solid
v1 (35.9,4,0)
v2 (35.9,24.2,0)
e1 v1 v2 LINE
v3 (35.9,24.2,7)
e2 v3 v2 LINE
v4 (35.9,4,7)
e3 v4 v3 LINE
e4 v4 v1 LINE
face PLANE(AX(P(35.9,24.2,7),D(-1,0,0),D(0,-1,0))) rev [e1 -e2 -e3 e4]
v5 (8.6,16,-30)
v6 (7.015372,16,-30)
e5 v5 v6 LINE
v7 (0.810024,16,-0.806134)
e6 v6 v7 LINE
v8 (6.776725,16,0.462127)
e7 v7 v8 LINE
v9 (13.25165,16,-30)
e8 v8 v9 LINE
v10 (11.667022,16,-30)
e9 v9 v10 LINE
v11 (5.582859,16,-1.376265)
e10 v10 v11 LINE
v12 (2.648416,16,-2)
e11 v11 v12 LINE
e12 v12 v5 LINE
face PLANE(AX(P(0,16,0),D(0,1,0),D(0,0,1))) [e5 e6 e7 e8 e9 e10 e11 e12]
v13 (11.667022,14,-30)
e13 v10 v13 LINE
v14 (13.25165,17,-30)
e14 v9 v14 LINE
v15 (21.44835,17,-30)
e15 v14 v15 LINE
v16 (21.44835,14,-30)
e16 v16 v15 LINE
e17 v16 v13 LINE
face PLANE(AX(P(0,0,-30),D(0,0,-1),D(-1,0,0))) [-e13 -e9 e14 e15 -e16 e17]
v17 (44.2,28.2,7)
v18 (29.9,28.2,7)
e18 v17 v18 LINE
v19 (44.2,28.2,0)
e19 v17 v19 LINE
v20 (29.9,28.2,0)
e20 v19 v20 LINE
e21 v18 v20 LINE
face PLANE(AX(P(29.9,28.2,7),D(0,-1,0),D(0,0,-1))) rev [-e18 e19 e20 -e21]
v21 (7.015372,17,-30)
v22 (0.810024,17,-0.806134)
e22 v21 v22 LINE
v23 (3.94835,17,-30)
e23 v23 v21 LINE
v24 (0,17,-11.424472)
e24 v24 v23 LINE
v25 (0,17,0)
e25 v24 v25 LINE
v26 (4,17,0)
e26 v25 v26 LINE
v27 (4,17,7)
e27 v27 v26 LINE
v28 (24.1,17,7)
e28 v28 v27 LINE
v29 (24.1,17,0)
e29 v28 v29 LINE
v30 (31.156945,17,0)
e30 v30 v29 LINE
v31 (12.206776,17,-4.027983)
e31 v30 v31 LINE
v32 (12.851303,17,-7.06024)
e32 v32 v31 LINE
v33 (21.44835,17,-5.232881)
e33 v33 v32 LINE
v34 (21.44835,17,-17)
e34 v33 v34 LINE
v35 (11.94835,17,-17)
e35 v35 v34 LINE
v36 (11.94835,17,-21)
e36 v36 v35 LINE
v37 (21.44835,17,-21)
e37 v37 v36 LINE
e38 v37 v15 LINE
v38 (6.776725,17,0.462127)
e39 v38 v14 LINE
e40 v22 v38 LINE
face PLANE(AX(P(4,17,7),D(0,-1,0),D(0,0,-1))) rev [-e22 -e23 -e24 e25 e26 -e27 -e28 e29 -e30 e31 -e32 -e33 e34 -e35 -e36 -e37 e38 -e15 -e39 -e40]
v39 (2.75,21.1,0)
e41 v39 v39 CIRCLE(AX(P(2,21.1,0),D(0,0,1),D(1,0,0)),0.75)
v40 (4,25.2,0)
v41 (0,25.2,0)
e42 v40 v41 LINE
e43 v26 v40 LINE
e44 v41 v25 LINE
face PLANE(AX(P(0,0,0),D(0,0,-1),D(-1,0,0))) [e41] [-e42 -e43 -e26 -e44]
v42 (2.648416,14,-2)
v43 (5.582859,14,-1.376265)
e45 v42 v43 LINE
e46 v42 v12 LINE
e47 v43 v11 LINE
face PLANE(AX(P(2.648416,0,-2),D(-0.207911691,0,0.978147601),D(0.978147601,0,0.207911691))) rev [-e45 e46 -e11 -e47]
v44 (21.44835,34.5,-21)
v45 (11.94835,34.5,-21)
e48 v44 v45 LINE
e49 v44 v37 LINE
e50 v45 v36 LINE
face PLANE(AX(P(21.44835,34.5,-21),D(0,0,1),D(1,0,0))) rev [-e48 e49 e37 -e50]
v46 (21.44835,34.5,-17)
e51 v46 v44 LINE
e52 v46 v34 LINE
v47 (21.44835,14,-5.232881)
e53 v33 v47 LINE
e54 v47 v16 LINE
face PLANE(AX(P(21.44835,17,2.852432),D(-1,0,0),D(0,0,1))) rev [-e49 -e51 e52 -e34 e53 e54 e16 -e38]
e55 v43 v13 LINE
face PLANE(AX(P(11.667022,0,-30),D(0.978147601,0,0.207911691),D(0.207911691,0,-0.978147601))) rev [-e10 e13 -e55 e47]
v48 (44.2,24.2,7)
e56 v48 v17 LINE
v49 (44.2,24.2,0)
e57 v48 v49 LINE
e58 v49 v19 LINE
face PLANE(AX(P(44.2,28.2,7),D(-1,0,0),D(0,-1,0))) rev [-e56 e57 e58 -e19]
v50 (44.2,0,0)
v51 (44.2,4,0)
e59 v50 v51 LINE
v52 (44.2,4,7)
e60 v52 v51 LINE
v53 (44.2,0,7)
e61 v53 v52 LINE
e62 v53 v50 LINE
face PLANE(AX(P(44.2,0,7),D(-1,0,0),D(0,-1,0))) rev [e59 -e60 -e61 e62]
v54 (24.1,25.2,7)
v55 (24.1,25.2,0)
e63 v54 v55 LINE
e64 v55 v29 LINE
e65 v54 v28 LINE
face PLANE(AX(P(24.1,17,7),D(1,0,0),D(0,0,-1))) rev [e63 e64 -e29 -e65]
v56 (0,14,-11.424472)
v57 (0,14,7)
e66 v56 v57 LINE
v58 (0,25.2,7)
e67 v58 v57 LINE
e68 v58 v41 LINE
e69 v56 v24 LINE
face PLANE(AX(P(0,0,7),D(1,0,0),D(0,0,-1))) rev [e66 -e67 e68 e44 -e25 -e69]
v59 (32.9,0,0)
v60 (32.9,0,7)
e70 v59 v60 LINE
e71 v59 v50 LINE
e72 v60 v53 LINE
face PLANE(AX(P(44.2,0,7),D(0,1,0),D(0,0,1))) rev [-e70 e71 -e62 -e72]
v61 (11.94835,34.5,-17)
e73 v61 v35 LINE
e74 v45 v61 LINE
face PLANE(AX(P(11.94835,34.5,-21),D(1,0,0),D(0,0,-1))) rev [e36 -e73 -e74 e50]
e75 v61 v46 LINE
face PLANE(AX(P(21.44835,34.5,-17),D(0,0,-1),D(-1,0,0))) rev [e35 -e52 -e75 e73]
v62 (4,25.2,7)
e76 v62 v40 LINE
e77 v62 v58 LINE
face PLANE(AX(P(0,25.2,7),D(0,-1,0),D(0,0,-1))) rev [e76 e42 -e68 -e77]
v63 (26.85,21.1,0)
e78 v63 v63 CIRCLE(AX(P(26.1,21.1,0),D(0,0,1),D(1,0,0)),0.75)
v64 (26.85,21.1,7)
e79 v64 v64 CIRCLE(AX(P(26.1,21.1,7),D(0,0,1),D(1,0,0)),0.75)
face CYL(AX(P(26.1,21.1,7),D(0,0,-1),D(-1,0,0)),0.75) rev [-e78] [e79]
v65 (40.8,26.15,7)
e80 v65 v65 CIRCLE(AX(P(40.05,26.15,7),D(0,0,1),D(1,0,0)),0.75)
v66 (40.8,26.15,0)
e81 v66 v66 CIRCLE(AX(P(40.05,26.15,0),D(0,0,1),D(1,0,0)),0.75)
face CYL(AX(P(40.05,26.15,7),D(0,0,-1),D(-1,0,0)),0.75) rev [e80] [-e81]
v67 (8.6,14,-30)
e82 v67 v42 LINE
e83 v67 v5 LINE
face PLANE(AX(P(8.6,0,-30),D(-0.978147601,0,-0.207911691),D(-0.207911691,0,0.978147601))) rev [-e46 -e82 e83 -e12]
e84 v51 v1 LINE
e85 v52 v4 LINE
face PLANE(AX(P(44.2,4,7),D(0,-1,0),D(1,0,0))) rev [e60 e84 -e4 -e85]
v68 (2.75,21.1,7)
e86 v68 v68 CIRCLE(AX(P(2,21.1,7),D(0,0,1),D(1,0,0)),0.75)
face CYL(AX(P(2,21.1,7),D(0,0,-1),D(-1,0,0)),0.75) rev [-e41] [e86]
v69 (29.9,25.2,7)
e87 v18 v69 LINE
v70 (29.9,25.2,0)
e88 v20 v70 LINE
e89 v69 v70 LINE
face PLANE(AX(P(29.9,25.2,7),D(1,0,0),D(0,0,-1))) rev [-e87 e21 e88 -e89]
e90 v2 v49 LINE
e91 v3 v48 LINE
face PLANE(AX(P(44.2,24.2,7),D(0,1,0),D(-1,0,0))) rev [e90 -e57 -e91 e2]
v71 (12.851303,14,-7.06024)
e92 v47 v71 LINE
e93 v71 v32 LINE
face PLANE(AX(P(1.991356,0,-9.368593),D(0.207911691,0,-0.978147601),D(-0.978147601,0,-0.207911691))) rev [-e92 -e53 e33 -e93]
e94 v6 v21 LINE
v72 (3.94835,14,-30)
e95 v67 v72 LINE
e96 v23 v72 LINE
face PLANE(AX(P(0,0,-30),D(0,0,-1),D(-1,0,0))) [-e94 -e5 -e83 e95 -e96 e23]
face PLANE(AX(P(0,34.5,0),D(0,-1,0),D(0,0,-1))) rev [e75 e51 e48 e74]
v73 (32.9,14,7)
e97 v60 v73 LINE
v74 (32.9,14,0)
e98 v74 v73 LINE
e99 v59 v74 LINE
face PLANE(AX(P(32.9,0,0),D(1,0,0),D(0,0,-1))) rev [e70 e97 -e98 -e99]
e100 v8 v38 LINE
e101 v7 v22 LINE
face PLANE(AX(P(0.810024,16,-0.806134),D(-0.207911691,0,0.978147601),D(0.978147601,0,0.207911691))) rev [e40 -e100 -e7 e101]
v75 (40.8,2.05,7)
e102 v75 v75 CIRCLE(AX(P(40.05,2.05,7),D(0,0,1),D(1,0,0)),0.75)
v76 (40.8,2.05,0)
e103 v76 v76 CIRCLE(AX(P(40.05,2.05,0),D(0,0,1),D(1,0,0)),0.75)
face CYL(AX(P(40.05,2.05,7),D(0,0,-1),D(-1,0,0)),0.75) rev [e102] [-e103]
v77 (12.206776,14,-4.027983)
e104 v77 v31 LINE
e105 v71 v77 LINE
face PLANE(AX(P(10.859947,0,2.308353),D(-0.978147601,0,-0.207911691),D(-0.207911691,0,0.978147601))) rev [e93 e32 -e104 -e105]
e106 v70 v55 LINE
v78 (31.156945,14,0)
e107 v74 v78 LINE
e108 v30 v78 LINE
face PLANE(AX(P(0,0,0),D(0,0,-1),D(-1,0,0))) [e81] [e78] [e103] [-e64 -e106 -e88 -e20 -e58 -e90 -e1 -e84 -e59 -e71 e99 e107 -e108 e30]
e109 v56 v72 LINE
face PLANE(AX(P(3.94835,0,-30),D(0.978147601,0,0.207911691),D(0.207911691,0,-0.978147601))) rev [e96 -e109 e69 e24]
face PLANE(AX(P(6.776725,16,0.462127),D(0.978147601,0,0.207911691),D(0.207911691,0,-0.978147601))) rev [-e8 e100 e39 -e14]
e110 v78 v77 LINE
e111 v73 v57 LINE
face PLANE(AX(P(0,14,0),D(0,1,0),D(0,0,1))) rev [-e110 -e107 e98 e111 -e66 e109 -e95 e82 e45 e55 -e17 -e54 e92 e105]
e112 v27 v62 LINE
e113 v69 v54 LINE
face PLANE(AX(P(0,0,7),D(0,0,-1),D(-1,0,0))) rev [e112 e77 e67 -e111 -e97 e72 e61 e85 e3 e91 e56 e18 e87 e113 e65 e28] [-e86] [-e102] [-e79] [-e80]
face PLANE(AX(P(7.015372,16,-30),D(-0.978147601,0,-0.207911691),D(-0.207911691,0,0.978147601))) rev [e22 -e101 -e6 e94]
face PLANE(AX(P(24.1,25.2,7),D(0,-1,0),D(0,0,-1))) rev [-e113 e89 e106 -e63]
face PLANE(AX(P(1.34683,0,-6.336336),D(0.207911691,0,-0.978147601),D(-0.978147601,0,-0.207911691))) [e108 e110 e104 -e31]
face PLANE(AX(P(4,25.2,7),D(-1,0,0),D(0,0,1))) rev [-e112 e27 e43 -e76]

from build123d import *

# Parameters (mm, degrees)
SKETCH1_R               = 0.75
BOSS_EXTRUDE1_DEPTH     = 7
SKETCH9_W               = 32.9
SKETCH9_H               = 14
CUT_EXTRUDE1_DEPTH      = 53.894990311
SKETCH10_W              = 24.1
SKETCH10_H              = 3
BOSS_EXTRUDE2_DEPTH     = 30
CUT_EXTRUDE2_DEPTH      = 57.059254365
CUT_EXTRUDE3_DEPTH      = 57.059254365
CUT_EXTRUDE4_DEPTH      = 1
CUT_EXTRUDE5_DEPTH      = 57.059254365
BOSS_EXTRUDE4_START     = 4
BOSS_EXTRUDE4_OUTLINE_W = 19.373526859
BOSS_EXTRUDE4_OUTLINE_H = 3
BOSS_EXTRUDE4_DEPTH     = 2.47789315
SKETCH21_W              = 25.330744156
SKETCH21_H              = 3
BOSS_EXTRUDE7_DEPTH     = 4
BOSS_EXTRUDE8_START     = 14
BOSS_EXTRUDE8_DEPTH     = 3
CUT_EXTRUDE6_REACH      = 66.171
SKETCH23_W              = 6.651649707
SKETCH23_H              = 3
SKETCH24_W              = 9.5
SKETCH24_H              = 4
BOSS_EXTRUDE9_DEPTH     = 17.5


with BuildPart() as part:
    # Sketch1 → Boss-Extrude1 (new body)
    with BuildSketch(Plane.XY):
        Polygon((0, 0), (0, 25.2), (4, 25.2), (4, 17), (24.1, 17), (24.1, 25.2), (29.9, 25.2), (29.9, 28.2), (44.2, 28.2), (44.2, 24.2), (35.9, 24.2), (35.9, 4), (44.2, 4), (44.2, 0), align=None)
        with Locations((2, 21.1)):
            Circle(SKETCH1_R, mode=Mode.SUBTRACT)
        with Locations((26.1, 21.1)):
            Circle(SKETCH1_R, mode=Mode.SUBTRACT)
        with Locations((40.05, 26.15)):
            Circle(SKETCH1_R, mode=Mode.SUBTRACT)
        with Locations((40.05, 2.05)):
            Circle(SKETCH1_R, mode=Mode.SUBTRACT)
    extrude(amount=BOSS_EXTRUDE1_DEPTH)

    # Sketch9 → Cut-Extrude1 (cut, through all)
    with BuildSketch(Plane.XY.offset(7)):
        with Locations((16.45, 7)):
            Rectangle(SKETCH9_W, SKETCH9_H)
    extrude(amount=-CUT_EXTRUDE1_DEPTH, mode=Mode.SUBTRACT)

    # Sketch10 → Boss-Extrude2 (add)
    with BuildSketch(Plane(origin=(0, 0, 0), x_dir=(-1, 0, 0), z_dir=(0, 0, -1))):
        with Locations((-12.05, 15.5)):
            Rectangle(SKETCH10_W, SKETCH10_H)
    extrude(amount=BOSS_EXTRUDE2_DEPTH)

    # Sketch11 → Cut-Extrude2 (cut, through all)
    with BuildSketch(Plane(origin=(0, 17, 0), x_dir=(1, 0, 0), z_dir=(0, 1, 0))):
        Polygon((8.6, 30), (2.648416273, 2), (5.582859075, 1.376264928), (11.667021785, 30), align=None)
    extrude(amount=-CUT_EXTRUDE2_DEPTH, mode=Mode.SUBTRACT)

    # Sketch12 → Cut-Extrude3 (cut, through all)
    with BuildSketch(Plane(origin=(0, 17, 0), x_dir=(1, 0, 0), z_dir=(0, 1, 0))):
        Polygon((12.20677635, 4.027982726), (24.1, 1.5), (24.1, 4.669255844), (12.851302592, 7.060240288), align=None)
    extrude(amount=-CUT_EXTRUDE3_DEPTH, mode=Mode.SUBTRACT)

    # Sketch14 → Cut-Extrude4 (cut)
    with BuildSketch(Plane(origin=(0, 17, 0), x_dir=(1, 0, 0), z_dir=(0, 1, 0))):
        Polygon((7.015372078, 30), (0.810024371, 0.80613434), (6.776724736, -0.462126974), (13.251649707, 30), align=None)
    extrude(amount=-CUT_EXTRUDE4_DEPTH, mode=Mode.SUBTRACT)

    # Sketch15 → Cut-Extrude5 (cut, through all)
    with BuildSketch(Plane(origin=(0, 17, 0), x_dir=(1, 0, 0), z_dir=(0, 1, 0))):
        Polygon((3.948350293, 30), (0, 11.424472327), (0, 30), align=None)
    extrude(amount=-CUT_EXTRUDE5_DEPTH, mode=Mode.SUBTRACT)

    # Boss-Extrude4: read off the stored shape, not the designer's step
    # Boss-Extrude4 outline → Boss-Extrude4 (add)
    with BuildSketch(Plane(origin=(0, 0, 0), x_dir=(0.9781476007338054, 0, 0.20791169081776006), z_dir=(0.2079116908177601, 0, -0.9781476007338055)).offset(BOSS_EXTRUDE4_START)):
        with Locations((20.78932773, -15.5)):
            Rectangle(BOSS_EXTRUDE4_OUTLINE_W, BOSS_EXTRUDE4_OUTLINE_H)
    extrude(amount=BOSS_EXTRUDE4_DEPTH)

    # Sketch21 → Boss-Extrude7 (add)
    with BuildSketch(Plane(origin=(24.1, 0, 0), x_dir=(0, 0, -1), z_dir=(1, 0, 0))):
        with Locations((17.334627922, 15.5)):
            Rectangle(SKETCH21_W, SKETCH21_H)
    extrude(amount=BOSS_EXTRUDE7_DEPTH)

    # Boss-Extrude8: read off the stored shape, not the designer's step
    # Boss-Extrude8 outline → Boss-Extrude8 (add)
    with BuildSketch(Plane(origin=(0, 0, 0), x_dir=(1, 0, 0), z_dir=(0, 1, 0)).offset(BOSS_EXTRUDE8_START)):
        Polygon((24.1, 4.669255844), (28.1, 3.819029597), (28.1, 4.669255844), align=None)
    extrude(amount=BOSS_EXTRUDE8_DEPTH)

    # Cut-Extrude6: up to this plane
    cut_extrude6_end = Plane(origin=(1.991355959, 0, -9.368593205), z_dir=(0.20791169081775973, 0, -0.9781476007338056))
    # Sketch23 → Cut-Extrude6 (cut, up to the surface)
    with BuildSketch(Plane(origin=(0, 0, -30), x_dir=(-1, 0, 0), z_dir=(0, 0, -1)), mode=Mode.PRIVATE) as cut_extrude6_sk1:
        with Locations((-24.774175146, 15.5)):
            Rectangle(SKETCH23_W, SKETCH23_H)
    cut_extrude6_tool1 = split(extrude(cut_extrude6_sk1.sketch, amount=-CUT_EXTRUDE6_REACH, mode=Mode.PRIVATE), bisect_by=cut_extrude6_end, keep=Keep.BOTH, mode=Mode.PRIVATE)
    add(cut_extrude6_tool1.solids().sort_by_distance((24.774175, 15.5, -30))[0], mode=Mode.SUBTRACT)

    # Sketch24 → Boss-Extrude9 (add)
    with BuildSketch(Plane(origin=(0, 17, 0), x_dir=(1, 0, 0), z_dir=(0, 1, 0))):
        with Locations((16.698350293, 19)):
            Rectangle(SKETCH24_W, SKETCH24_H)
    extrude(amount=BOSS_EXTRUDE9_DEPTH)


solid = part.part
